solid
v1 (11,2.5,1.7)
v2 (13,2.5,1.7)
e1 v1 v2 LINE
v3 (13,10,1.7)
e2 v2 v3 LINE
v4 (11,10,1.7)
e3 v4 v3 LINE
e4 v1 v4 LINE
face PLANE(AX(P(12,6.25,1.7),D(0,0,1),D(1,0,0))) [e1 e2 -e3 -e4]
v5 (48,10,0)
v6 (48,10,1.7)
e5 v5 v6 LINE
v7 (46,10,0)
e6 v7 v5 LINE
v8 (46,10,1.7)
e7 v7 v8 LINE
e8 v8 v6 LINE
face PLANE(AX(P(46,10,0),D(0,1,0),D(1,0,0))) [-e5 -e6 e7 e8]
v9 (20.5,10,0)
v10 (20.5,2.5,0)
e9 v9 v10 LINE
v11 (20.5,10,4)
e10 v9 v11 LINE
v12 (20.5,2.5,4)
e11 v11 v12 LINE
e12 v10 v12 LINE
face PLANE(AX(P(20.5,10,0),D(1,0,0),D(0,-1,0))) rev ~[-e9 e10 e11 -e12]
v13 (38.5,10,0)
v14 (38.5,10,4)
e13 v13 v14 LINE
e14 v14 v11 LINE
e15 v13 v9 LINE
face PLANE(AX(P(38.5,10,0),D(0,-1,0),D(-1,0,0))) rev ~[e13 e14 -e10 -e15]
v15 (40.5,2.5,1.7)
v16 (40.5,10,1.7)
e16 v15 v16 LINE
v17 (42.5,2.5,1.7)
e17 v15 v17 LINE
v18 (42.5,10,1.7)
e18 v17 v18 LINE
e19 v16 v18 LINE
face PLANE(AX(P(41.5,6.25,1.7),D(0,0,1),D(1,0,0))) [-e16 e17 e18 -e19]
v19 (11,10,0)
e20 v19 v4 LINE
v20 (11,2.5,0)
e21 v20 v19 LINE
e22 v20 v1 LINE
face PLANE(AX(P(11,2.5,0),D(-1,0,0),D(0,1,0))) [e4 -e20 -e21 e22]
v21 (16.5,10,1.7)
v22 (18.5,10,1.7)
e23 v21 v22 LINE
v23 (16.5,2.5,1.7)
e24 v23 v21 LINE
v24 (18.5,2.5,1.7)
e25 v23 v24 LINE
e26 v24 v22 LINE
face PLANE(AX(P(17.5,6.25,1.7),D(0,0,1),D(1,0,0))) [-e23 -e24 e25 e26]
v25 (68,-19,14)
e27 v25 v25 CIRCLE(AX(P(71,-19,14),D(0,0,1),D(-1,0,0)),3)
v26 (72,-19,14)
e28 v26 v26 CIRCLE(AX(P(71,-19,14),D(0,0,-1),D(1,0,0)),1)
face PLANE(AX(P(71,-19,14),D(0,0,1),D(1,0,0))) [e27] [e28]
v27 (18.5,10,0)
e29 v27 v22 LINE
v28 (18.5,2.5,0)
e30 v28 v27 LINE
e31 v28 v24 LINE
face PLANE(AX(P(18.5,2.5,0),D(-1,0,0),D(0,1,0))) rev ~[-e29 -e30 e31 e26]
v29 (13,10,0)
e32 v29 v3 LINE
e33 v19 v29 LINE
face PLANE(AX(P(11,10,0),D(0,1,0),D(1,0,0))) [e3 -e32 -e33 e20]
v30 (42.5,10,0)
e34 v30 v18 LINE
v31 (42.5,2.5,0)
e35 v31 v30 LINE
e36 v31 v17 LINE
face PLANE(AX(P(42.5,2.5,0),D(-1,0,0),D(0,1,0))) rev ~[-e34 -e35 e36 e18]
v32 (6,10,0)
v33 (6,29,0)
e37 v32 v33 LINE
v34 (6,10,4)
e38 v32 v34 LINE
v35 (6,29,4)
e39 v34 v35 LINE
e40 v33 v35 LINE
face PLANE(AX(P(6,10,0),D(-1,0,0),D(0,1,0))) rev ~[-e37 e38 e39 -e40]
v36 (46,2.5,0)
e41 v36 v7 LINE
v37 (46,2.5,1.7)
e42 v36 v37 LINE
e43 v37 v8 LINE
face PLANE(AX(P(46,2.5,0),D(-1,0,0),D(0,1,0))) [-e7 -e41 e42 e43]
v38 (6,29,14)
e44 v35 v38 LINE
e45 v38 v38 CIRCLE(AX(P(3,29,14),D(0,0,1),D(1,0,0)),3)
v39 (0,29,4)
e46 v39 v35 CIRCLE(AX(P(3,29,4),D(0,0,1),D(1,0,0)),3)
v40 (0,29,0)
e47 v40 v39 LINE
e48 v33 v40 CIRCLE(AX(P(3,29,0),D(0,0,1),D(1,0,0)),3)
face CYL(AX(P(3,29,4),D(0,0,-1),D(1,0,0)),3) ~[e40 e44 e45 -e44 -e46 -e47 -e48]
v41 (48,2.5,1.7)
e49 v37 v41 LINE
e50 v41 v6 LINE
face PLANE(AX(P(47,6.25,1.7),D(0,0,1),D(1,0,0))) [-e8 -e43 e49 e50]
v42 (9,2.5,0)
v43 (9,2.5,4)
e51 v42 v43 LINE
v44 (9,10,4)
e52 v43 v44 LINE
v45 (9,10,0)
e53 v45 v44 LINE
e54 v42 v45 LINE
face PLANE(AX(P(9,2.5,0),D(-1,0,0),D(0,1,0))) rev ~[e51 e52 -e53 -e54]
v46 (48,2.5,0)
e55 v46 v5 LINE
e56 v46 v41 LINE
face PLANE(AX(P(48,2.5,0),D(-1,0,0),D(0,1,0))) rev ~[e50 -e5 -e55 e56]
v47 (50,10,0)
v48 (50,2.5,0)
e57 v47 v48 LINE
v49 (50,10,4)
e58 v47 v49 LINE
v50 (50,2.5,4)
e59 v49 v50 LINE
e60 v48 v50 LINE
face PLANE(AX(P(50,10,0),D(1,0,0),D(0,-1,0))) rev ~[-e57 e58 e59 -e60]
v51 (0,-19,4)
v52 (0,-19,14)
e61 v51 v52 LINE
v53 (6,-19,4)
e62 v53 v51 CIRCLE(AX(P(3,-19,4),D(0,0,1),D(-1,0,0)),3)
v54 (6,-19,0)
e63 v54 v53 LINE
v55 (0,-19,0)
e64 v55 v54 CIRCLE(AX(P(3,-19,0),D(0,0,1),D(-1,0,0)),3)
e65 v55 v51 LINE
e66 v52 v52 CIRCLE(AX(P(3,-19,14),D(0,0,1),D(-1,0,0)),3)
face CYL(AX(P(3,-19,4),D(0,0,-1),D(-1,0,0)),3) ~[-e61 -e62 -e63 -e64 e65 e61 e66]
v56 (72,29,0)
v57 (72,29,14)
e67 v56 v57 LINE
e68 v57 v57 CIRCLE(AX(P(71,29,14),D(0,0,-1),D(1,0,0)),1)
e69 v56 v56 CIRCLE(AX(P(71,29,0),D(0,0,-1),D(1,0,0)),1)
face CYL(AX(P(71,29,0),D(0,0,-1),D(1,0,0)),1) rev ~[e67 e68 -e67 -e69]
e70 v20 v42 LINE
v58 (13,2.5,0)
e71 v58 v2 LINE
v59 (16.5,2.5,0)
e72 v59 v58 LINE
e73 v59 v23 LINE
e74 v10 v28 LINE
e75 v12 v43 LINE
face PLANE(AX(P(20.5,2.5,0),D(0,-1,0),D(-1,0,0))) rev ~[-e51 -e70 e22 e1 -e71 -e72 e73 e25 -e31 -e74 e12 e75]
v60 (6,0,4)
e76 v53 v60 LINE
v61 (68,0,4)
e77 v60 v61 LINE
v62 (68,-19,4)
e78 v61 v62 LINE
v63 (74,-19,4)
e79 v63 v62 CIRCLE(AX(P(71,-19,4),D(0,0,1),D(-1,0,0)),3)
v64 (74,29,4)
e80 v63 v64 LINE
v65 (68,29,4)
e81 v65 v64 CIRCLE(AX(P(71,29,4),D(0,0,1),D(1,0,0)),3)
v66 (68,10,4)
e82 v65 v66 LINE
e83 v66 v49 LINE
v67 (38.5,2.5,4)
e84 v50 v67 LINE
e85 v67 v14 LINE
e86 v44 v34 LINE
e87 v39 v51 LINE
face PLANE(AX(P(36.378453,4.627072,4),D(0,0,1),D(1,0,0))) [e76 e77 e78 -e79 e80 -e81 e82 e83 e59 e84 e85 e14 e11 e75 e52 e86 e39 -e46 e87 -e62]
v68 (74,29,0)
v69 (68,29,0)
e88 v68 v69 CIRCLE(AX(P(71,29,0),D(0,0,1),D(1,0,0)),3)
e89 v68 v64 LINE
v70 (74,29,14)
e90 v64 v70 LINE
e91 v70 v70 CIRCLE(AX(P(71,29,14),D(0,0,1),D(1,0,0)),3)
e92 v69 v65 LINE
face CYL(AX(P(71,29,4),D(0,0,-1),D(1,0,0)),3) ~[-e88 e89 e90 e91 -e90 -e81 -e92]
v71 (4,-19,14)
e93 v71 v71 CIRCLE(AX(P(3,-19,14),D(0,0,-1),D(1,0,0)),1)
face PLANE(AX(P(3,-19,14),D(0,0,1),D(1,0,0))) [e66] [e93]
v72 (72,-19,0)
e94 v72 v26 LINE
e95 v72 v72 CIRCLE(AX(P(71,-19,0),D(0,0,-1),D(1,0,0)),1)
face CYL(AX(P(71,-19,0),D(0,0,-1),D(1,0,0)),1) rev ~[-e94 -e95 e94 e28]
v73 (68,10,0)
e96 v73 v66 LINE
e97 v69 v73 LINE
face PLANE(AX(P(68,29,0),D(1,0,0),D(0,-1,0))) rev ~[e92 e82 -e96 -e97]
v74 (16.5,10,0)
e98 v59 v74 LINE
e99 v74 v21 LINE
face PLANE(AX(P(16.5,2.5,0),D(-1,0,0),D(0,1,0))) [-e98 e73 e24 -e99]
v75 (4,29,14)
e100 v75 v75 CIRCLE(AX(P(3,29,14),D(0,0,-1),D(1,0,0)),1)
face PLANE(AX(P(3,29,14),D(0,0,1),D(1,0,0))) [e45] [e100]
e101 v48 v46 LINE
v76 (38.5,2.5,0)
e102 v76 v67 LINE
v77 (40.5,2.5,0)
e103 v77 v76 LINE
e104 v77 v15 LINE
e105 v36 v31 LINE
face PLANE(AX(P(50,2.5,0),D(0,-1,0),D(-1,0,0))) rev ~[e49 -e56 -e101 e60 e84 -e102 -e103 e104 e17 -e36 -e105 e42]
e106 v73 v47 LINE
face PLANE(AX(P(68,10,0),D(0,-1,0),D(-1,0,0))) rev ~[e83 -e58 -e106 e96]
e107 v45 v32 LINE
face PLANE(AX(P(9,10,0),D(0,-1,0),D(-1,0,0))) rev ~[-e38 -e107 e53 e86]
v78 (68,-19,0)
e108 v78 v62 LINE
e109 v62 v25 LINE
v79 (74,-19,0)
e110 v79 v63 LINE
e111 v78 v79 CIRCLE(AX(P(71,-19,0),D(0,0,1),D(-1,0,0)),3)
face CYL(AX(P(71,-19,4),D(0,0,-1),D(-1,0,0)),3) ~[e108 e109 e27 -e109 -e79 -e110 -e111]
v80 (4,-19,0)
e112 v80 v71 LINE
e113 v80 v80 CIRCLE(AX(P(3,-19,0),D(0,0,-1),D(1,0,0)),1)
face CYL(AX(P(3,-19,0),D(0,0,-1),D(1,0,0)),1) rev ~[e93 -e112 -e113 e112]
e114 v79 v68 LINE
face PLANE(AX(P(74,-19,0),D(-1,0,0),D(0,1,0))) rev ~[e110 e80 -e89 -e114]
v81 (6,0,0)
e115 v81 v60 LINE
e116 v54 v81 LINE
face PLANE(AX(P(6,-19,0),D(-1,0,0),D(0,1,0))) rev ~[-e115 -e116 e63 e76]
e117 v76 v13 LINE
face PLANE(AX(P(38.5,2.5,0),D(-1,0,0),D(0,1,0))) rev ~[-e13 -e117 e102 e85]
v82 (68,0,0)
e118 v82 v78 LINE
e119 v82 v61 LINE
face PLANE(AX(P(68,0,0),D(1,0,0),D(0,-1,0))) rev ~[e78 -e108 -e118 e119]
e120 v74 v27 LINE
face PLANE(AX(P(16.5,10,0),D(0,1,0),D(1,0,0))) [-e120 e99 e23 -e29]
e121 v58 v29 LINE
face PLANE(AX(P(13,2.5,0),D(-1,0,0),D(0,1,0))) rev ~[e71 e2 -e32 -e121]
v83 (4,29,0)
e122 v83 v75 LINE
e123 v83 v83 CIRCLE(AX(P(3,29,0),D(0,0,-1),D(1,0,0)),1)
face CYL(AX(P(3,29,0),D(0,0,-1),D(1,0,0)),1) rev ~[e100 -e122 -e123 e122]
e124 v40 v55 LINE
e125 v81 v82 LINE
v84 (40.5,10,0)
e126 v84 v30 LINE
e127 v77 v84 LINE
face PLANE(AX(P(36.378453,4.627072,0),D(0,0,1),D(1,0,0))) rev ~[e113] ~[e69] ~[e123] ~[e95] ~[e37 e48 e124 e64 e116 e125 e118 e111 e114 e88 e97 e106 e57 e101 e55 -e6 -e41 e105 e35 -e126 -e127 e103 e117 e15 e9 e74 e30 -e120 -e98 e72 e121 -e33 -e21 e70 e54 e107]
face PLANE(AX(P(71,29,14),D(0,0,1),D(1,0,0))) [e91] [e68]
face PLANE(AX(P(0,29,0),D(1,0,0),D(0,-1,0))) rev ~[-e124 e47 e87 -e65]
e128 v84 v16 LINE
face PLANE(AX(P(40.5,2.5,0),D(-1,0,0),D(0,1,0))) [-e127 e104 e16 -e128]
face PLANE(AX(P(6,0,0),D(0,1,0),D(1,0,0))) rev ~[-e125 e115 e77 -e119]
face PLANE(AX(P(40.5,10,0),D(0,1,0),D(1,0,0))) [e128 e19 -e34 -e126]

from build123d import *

# Parameters (mm, degrees)
F1_DEPTH = 4
F2_W     = 2
F2_H     = 7.5
F3_DEPTH = 1.7
F5_DEPTH = 10
F6_R     = 1
F7_DEPTH = 25


with BuildPart() as f1:
    # F0 (on Top) → F1 (new body)
    with BuildSketch(Plane.XY):
        with BuildLine():
            Line((6, 0), (68, 0))
            Line((68, 0), (68, -19))
            ThreePointArc((68, -19), (71, -22), (74, -19))
            Line((74, -19), (74, 29))
            ThreePointArc((74, 29), (71, 32), (68, 29))
            Line((68, 29), (68, 10))
            Line((68, 10), (50, 10))
            Line((50, 10), (50, 2.5))
            Line((50, 2.5), (38.5, 2.5))
            Line((38.5, 2.5), (38.5, 10))
            Line((38.5, 10), (20.5, 10))
            Line((20.5, 10), (20.5, 2.5))
            Line((20.5, 2.5), (9, 2.5))
            Line((9, 2.5), (9, 10))
            Line((9, 10), (6, 10))
            Line((6, 10), (6, 29))
            ThreePointArc((6, 29), (3, 32), (0, 29))
            Line((0, 29), (0, -19))
            ThreePointArc((0, -19), (3, -22), (6, -19))
            Line((6, -19), (6, 0))
        make_face()
    extrude(amount=F1_DEPTH)

    # F2 (on Top) → F3 (join)
    with BuildSketch(Plane.XY):
        with Locations((12, 6.25)):
            Rectangle(F2_W, F2_H)
        with Locations((17.5, 6.25)):
            Rectangle(F2_W, F2_H)
        with Locations((41.5, 6.25)):
            Rectangle(F2_W, F2_H)
        with Locations((47, 6.25)):
            Rectangle(F2_W, F2_H)
    extrude(amount=F3_DEPTH)

    # F4 (on face) → F5 (join)
    with BuildSketch(Plane.XY.offset(4)):
        with BuildLine():
            ThreePointArc((0, 29), (3, 26), (6, 29))
            ThreePointArc((6, 29), (3, 32), (0, 29))
        make_face()
        with BuildLine():
            ThreePointArc((6, -19), (3, -16), (0, -19))
            ThreePointArc((0, -19), (3, -22), (6, -19))
        make_face()
        with BuildLine():
            ThreePointArc((74, -19), (71, -16), (68, -19))
            ThreePointArc((68, -19), (71, -22), (74, -19))
        make_face()
        with BuildLine():
            ThreePointArc((68, 29), (71, 26), (74, 29))
            ThreePointArc((74, 29), (71, 32), (68, 29))
        make_face()
    extrude(amount=F5_DEPTH)

    # F6 (on face) → F7 (cut)
    with BuildSketch(Plane(origin=(0, 0, 0), x_dir=(1, 0, 0), z_dir=(0, 0, -1))):
        with Locations((3, 19)):
            Circle(F6_R)
        with Locations((71, 19)):
            Circle(F6_R)
        with Locations((71, -29)):
            Circle(F6_R)
        with Locations((3, -29)):
            Circle(F6_R)
    extrude(amount=-F7_DEPTH, mode=Mode.SUBTRACT)


solid = f1.part
